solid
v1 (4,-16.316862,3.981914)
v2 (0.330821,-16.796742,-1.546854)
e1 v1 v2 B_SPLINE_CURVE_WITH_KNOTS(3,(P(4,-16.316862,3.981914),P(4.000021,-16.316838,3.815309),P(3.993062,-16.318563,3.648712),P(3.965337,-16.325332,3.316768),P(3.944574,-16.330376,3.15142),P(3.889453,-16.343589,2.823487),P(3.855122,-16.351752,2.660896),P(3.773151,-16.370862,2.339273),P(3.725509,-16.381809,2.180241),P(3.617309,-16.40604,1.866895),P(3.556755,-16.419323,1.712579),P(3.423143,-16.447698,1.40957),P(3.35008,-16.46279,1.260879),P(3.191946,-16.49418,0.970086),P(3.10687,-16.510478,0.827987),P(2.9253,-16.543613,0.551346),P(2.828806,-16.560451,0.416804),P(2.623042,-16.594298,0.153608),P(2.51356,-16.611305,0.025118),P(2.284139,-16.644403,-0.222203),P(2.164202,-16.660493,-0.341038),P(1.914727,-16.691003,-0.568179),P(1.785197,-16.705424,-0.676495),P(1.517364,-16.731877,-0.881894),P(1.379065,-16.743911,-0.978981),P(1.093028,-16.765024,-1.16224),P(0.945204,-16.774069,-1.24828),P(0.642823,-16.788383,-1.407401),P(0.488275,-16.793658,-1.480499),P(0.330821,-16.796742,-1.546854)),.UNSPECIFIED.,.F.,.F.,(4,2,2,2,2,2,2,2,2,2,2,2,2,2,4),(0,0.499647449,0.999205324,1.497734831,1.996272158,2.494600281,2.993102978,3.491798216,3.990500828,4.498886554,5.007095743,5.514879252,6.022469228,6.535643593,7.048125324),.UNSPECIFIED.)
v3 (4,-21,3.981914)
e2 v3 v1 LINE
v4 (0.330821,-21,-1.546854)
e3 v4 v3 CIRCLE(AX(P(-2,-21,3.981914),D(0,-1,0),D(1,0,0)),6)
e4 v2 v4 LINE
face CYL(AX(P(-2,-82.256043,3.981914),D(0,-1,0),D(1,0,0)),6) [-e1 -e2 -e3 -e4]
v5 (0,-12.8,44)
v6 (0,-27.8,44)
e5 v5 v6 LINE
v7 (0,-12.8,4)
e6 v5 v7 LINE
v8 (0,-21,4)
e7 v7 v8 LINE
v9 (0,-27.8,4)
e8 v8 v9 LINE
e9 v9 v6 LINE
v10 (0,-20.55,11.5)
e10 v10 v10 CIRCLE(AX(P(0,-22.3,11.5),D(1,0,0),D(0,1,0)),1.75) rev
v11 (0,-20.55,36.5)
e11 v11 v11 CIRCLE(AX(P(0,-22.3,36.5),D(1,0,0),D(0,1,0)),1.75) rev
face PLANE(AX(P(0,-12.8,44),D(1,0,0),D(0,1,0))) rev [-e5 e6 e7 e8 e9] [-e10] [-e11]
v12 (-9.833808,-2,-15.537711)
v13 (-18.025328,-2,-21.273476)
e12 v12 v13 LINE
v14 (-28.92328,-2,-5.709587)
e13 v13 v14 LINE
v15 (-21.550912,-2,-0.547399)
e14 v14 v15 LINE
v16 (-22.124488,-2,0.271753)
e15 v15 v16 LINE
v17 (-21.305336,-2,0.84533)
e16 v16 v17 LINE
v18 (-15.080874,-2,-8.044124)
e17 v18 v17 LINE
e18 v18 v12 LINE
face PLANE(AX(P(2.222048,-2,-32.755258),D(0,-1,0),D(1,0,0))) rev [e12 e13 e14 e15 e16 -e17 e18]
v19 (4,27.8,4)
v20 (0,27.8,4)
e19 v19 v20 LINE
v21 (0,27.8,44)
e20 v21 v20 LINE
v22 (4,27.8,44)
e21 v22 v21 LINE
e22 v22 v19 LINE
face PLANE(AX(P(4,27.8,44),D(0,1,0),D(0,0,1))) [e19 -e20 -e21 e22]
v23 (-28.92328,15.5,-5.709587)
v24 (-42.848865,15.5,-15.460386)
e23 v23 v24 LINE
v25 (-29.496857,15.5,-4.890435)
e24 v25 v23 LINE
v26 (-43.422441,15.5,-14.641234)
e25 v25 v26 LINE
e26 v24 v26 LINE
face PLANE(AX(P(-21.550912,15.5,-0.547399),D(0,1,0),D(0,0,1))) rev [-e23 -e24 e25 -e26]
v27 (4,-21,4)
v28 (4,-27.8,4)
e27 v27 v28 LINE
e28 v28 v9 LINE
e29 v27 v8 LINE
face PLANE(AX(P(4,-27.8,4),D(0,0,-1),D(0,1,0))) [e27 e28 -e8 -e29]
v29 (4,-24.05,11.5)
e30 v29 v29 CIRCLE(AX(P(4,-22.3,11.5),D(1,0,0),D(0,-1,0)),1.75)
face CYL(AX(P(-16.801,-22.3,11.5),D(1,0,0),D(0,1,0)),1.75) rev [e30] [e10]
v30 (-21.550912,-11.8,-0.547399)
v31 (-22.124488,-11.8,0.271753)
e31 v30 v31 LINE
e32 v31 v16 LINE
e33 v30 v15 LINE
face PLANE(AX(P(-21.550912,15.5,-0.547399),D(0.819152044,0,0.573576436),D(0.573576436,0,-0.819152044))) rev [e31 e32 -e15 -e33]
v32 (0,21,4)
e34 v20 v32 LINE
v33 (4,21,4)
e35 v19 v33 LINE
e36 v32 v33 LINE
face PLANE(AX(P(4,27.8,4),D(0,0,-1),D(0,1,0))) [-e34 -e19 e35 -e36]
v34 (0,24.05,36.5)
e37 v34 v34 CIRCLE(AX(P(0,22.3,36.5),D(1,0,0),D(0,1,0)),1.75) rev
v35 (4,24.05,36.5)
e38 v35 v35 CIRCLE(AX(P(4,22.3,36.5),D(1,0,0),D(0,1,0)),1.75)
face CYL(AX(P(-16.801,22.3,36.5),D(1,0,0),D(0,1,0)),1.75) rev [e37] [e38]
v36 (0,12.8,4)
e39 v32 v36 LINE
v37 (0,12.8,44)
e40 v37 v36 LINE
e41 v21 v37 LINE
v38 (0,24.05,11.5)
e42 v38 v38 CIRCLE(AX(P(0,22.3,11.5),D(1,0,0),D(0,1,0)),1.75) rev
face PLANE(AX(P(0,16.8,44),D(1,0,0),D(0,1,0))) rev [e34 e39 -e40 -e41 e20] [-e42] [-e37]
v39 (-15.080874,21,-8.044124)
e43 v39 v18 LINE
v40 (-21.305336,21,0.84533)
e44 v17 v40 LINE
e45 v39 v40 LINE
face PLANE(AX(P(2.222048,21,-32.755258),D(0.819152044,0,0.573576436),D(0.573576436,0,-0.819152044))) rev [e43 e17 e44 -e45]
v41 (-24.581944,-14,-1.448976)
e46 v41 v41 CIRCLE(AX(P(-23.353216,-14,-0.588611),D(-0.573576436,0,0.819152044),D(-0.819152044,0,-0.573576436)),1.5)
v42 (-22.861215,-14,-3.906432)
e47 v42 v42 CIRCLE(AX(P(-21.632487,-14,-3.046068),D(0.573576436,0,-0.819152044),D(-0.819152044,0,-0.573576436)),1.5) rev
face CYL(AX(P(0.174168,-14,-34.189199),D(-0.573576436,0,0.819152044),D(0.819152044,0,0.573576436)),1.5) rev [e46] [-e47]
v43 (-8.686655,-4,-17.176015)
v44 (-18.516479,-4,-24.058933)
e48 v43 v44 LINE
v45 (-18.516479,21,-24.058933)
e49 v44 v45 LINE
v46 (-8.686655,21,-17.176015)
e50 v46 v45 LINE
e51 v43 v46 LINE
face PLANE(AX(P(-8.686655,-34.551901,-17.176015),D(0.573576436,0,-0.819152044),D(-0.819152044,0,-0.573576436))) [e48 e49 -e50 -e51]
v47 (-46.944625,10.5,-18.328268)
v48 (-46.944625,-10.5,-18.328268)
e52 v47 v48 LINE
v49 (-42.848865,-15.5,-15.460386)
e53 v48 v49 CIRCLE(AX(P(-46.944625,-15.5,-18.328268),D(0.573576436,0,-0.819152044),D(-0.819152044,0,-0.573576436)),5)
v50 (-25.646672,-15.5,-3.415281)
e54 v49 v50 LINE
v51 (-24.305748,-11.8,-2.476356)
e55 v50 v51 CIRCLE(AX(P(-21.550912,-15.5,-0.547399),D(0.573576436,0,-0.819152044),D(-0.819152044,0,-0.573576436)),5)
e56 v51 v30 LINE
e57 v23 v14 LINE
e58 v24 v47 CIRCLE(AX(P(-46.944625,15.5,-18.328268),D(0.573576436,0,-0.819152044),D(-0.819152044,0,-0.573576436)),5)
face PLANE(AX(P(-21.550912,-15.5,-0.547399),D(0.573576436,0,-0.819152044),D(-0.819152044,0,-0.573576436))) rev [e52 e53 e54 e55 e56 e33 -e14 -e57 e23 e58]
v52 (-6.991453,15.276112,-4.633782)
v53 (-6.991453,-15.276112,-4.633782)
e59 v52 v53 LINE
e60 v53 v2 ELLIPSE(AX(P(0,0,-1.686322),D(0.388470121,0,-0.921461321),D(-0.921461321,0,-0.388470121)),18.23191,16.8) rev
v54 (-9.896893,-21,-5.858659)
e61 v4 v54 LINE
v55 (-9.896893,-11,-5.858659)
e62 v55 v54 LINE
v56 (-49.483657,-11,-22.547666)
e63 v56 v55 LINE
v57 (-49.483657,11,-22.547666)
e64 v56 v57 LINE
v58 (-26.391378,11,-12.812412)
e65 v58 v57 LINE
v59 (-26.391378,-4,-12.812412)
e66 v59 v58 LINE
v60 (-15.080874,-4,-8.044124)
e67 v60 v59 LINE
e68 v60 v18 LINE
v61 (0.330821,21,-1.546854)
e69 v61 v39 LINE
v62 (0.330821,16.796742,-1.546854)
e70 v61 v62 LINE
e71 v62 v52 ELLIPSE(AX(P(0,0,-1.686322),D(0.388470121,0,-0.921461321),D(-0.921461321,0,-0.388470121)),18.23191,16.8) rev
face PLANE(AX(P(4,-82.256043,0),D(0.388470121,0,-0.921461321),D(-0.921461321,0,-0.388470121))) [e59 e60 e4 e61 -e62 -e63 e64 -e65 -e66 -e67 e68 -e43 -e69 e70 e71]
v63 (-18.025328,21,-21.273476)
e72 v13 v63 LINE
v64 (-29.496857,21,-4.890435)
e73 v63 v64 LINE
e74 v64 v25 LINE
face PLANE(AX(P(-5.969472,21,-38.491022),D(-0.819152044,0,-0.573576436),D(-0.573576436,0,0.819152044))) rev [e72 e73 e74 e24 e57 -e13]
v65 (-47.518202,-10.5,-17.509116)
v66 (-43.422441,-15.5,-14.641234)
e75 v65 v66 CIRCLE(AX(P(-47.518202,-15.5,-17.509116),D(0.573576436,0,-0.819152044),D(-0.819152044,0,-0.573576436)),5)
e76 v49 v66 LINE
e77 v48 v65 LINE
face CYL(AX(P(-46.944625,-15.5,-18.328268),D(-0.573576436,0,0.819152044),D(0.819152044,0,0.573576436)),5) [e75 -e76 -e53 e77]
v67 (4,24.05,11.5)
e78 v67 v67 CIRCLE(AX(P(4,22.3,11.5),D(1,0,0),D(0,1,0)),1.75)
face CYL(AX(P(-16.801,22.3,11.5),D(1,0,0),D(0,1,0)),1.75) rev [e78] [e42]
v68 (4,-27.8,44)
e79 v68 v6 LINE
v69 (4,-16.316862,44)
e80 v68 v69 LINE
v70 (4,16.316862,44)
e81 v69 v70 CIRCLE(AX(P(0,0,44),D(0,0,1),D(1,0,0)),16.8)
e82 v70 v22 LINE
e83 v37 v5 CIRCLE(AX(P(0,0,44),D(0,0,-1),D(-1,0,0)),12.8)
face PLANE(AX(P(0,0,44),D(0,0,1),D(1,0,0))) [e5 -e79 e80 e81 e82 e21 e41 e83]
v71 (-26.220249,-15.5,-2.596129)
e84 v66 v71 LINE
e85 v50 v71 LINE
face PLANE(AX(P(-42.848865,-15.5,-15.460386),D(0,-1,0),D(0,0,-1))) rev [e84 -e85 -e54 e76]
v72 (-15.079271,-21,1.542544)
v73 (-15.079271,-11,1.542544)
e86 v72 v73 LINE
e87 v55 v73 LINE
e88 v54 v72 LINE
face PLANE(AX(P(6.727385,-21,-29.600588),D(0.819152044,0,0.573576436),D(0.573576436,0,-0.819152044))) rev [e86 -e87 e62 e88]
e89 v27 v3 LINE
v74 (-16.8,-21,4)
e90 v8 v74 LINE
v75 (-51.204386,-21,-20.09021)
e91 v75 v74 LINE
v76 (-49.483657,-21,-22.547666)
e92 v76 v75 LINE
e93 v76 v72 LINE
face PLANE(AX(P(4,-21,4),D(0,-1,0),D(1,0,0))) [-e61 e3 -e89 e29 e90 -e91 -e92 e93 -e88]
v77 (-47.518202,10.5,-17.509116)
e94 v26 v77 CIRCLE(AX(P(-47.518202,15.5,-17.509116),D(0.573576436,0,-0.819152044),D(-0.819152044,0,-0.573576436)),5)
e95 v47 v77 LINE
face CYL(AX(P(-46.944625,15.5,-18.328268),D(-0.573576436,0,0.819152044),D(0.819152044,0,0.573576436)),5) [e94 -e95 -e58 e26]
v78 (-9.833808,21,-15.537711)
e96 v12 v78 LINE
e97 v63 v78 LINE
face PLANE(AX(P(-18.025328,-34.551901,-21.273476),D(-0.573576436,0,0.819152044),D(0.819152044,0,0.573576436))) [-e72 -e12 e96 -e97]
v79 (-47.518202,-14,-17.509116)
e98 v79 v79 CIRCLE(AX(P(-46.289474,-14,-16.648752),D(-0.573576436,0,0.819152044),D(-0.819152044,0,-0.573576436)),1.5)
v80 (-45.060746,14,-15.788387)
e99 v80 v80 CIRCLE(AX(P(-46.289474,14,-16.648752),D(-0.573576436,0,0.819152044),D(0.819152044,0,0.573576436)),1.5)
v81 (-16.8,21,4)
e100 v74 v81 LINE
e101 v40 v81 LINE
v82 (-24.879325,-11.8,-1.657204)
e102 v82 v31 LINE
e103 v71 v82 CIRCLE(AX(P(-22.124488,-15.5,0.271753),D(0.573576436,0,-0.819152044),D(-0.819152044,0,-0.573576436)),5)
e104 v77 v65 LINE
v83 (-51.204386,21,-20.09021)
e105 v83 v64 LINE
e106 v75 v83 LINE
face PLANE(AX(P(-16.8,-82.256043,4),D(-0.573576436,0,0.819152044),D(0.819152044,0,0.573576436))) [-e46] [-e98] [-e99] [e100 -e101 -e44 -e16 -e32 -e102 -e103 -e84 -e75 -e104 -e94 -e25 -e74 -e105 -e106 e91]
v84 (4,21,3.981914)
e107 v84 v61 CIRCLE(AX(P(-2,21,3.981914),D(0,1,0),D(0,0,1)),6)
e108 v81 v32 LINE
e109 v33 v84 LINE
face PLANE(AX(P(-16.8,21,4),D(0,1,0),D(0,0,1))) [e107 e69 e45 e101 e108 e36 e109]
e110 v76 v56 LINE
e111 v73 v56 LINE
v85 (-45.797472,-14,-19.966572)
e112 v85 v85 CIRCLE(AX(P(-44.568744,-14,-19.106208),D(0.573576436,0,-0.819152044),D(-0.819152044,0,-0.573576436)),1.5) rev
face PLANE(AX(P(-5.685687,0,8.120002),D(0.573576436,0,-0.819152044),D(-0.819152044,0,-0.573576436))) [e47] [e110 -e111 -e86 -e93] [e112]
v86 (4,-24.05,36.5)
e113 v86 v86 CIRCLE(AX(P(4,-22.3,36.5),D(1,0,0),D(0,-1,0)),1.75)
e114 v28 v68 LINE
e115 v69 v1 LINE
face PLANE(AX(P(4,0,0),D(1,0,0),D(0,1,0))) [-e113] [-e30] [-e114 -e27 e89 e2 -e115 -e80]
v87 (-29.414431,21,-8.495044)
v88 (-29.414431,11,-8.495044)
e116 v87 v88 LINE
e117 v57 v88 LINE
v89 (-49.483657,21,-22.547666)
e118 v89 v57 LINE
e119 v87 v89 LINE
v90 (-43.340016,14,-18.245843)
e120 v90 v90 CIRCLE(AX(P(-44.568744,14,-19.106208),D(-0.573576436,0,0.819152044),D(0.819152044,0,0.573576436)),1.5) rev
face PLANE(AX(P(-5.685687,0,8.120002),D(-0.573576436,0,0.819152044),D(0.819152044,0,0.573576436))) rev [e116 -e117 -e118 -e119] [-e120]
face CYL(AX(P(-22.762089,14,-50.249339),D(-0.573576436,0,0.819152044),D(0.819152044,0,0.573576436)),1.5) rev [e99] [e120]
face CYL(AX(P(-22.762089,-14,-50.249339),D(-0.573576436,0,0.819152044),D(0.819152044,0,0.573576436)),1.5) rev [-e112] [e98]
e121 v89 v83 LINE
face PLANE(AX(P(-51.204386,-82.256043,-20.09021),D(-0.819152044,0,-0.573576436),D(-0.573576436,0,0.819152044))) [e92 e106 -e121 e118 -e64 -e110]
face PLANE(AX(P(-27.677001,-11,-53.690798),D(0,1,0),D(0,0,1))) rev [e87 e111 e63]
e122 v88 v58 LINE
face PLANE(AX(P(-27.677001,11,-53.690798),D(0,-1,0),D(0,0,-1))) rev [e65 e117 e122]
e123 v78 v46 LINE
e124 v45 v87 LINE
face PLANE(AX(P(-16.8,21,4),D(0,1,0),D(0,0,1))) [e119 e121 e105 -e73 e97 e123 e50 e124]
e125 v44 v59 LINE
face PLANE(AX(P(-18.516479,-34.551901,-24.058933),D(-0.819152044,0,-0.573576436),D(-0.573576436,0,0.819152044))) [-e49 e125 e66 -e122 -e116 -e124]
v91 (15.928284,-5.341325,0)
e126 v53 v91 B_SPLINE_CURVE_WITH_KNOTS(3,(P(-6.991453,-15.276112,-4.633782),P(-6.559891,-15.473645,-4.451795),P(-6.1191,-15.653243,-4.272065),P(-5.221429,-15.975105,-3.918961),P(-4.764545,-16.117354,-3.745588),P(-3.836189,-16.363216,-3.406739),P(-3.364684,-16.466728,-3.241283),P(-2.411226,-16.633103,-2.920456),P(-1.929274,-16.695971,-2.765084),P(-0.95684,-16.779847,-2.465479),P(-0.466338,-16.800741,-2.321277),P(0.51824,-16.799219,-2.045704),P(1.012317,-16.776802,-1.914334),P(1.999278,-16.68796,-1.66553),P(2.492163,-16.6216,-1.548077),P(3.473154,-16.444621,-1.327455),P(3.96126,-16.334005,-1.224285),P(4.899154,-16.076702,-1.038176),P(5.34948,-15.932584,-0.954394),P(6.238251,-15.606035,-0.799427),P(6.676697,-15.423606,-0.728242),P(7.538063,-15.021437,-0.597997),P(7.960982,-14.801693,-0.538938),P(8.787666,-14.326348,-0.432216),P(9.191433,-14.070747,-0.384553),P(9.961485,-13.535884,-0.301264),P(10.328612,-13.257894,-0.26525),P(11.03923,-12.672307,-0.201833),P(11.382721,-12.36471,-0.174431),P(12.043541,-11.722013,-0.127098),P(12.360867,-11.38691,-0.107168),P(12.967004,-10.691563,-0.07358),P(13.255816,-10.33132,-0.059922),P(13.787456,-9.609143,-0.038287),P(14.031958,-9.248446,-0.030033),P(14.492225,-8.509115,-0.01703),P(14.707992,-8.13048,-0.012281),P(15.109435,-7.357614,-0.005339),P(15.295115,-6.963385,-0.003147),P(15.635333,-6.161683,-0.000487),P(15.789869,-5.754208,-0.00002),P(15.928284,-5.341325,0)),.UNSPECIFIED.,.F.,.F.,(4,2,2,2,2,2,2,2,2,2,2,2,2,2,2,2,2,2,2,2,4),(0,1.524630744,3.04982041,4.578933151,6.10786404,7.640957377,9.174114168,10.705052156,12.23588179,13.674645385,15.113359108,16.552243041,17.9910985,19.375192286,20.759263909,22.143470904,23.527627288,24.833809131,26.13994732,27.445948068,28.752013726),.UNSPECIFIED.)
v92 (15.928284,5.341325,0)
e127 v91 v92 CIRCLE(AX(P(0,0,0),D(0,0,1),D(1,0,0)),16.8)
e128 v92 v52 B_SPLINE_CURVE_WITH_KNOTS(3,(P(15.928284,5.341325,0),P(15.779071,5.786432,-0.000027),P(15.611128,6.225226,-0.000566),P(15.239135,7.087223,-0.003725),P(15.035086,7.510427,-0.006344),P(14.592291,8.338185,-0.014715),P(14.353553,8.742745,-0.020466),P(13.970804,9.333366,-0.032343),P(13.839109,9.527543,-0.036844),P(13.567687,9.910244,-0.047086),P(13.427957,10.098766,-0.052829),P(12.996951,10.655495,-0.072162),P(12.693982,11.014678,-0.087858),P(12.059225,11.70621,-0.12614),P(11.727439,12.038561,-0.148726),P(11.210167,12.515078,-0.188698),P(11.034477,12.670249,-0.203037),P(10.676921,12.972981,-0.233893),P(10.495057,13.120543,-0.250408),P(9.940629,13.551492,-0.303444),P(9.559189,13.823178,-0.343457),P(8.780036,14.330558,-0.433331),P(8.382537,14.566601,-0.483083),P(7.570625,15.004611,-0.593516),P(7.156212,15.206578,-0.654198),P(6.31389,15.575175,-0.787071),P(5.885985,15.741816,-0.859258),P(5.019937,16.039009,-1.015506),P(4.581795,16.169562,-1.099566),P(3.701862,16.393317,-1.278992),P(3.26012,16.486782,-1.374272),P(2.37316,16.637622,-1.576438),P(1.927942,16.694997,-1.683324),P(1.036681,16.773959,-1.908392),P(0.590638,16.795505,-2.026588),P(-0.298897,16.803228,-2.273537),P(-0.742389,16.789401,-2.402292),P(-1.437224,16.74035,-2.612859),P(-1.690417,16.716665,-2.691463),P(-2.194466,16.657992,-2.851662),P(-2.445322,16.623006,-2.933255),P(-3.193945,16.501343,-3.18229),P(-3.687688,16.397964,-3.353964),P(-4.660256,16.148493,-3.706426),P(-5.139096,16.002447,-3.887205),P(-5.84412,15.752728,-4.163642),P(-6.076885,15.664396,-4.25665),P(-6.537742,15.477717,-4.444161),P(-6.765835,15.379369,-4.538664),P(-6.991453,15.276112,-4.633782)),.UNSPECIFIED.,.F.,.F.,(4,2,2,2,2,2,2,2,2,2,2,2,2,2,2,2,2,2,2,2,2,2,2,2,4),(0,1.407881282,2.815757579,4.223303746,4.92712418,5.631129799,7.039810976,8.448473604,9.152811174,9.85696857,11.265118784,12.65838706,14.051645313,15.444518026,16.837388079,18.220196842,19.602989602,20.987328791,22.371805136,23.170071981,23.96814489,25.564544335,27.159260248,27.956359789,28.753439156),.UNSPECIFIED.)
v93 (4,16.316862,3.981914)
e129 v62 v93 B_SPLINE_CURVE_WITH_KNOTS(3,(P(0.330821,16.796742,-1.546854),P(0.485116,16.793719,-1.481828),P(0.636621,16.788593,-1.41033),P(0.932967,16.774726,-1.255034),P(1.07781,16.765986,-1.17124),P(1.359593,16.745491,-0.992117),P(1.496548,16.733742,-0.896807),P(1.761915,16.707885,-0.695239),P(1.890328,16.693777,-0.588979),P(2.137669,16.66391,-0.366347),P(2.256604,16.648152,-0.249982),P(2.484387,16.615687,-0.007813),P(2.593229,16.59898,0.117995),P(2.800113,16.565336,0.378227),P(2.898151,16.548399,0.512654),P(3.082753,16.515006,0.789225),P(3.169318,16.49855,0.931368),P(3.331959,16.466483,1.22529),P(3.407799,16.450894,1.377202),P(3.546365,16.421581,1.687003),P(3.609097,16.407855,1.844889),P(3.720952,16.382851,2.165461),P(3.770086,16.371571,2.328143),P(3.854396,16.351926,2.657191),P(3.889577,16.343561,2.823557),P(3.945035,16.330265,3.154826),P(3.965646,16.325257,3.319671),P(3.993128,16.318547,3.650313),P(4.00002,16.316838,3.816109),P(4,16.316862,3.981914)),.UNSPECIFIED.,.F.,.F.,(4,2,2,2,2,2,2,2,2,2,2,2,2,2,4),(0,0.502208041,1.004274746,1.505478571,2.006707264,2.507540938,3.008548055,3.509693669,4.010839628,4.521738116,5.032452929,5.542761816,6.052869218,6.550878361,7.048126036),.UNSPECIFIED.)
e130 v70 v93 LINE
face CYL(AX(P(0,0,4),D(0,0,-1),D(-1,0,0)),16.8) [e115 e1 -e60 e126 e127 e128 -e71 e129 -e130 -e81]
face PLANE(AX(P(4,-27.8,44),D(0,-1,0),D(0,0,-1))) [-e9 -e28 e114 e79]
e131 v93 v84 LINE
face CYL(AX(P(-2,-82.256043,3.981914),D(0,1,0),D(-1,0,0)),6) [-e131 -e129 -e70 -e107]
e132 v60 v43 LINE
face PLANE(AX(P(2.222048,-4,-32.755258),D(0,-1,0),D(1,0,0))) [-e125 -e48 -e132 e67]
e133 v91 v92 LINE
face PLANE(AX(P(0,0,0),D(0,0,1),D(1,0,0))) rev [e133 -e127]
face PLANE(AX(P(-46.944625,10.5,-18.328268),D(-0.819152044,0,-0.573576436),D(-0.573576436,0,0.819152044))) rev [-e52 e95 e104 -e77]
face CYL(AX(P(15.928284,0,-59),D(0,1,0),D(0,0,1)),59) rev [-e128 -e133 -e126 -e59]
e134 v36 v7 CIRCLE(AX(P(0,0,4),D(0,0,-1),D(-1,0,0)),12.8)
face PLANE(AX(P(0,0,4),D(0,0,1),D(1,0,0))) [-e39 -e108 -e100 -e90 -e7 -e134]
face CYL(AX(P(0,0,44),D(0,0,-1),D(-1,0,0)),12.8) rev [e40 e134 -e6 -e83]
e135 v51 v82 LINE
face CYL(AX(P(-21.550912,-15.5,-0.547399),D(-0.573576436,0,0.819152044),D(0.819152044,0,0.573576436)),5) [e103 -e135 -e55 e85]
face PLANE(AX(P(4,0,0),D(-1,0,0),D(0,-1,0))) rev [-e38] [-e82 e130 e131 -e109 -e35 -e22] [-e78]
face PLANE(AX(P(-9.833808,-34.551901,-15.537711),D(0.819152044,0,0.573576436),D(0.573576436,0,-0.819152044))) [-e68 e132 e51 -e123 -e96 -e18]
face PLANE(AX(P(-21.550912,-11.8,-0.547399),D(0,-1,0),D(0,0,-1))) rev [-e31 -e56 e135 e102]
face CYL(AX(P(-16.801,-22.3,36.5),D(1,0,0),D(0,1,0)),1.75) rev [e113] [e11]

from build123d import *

# Parameters (mm, degrees)
SKETCH1_R           = 16.8
BOSS_EXTRUDE1_DEPTH = 4
BOSS_EXTRUDE2_DEPTH = 40
BOSS_EXTRUDE3_START = 4
BOSS_EXTRUDE3_DEPTH = 40
CUT_EXTRUDE1_REACH  = 58.049
SKETCH4_R           = 1.75
SKETCH6_W           = 20.8
SKETCH6_H           = 42
BOSS_EXTRUDE5_DEPTH = 4
BOSS_EXTRUDE7_REACH = 69.821
SKETCH14_R          = 1.5
CUT_EXTRUDE7_DEPTH  = 62.710359375
CUT_EXTRUDE8_START  = -3
SKETCH15_W          = 27
SKETCH15_H          = 10
SKETCH15_W_2        = 42
CUT_EXTRUDE8_DEPTH  = 59.710359375
SKETCH16_W          = 10
SKETCH16_H          = 23
CUT_EXTRUDE9_DEPTH  = 62.710359375
CUT_EXTRUDE10_DEPTH = 1
FILLET2_R           = 59
FILLET4_R           = 6
BOSS_EXTRUDE8_DEPTH = 25
BOSS_EXTRUDE9_START = -13.299219
SKETCH19_W          = 12
SKETCH19_H          = 2
BOSS_EXTRUDE9_DEPTH = 11.299219


# Read off the part's stored shape, not the designer's step: Boss-Extrude3
with BuildPart() as part:
    # Sketch1 → Boss-Extrude1 (new body)
    with BuildSketch(Plane(origin=(0, 0, 0), x_dir=(0, 1, 0), z_dir=(0, 0, 1))):
        with Locations(Location((0, 0, 0), (0, 0, 270))):
            Circle(SKETCH1_R)
    extrude(amount=BOSS_EXTRUDE1_DEPTH)

    # Sketch2 → Boss-Extrude2 (add)
    with BuildSketch(Plane.XY.offset(4)):
        with BuildLine():
            Line((0, 16.8), (0, 12.8))
            ThreePointArc((0, 12.8), (12.8, 0), (0, -12.8))
            Line((0, -12.8), (0, -16.8))
            ThreePointArc((0, -16.8), (16.8, 0), (0, 16.8))
        make_face()
    extrude(amount=BOSS_EXTRUDE2_DEPTH)

    # Boss-Extrude3 outline → Boss-Extrude3 (add)
    with BuildSketch(Plane.XY.offset(BOSS_EXTRUDE3_START)):
        with BuildLine():
            Line((0, 27.8), (0, 16.8))
            ThreePointArc((0, 16.8), (2.014536045, 16.678778268), (4, 16.316862443))
            Line((4, 16.316862443), (4, 27.8))
            Line((4, 27.8), (0, 27.8))
        make_face()
        with BuildLine():
            ThreePointArc((4, -16.316862443), (2.014536045, -16.678778268), (0, -16.8))
            Line((0, -16.8), (0, -27.8))
            Line((0, -27.8), (4, -27.8))
            Line((4, -27.8), (4, -16.316862443))
        make_face()
    extrude(amount=BOSS_EXTRUDE3_DEPTH)

    # Sketch4 → Cut-Extrude1 (cut, up to next)
    with BuildSketch(Plane.YZ.offset(4), mode=Mode.PRIVATE) as cut_extrude1_sk1:
        with Locations((22.3, 36.5)):
            Circle(SKETCH4_R)
    cut_extrude1_tool1 = extrude(cut_extrude1_sk1.sketch, amount=-CUT_EXTRUDE1_REACH, mode=Mode.PRIVATE) & part.part
    # Sketch4 → Cut-Extrude1 (cut, up to next)
    with BuildSketch(Plane.YZ.offset(4), mode=Mode.PRIVATE) as cut_extrude1_sk2:
        with Locations((22.3, 11.5)):
            Circle(SKETCH4_R)
    cut_extrude1_tool2 = extrude(cut_extrude1_sk2.sketch, amount=-CUT_EXTRUDE1_REACH, mode=Mode.PRIVATE) & part.part
    # Sketch4 → Cut-Extrude1 (cut, up to next)
    with BuildSketch(Plane.YZ.offset(4), mode=Mode.PRIVATE) as cut_extrude1_sk3:
        with Locations((-22.3, 11.5)):
            Circle(SKETCH4_R)
    cut_extrude1_tool3 = extrude(cut_extrude1_sk3.sketch, amount=-CUT_EXTRUDE1_REACH, mode=Mode.PRIVATE) & part.part
    # Sketch4 → Cut-Extrude1 (cut, up to next)
    with BuildSketch(Plane.YZ.offset(4), mode=Mode.PRIVATE) as cut_extrude1_sk4:
        with Locations((-22.3, 36.5)):
            Circle(SKETCH4_R)
    cut_extrude1_tool4 = extrude(cut_extrude1_sk4.sketch, amount=-CUT_EXTRUDE1_REACH, mode=Mode.PRIVATE) & part.part
    add(cut_extrude1_tool1.solids().sort_by_distance((4, 22.3, 36.5))[0], mode=Mode.SUBTRACT)
    add(cut_extrude1_tool2.solids().sort_by_distance((4, 22.3, 11.5))[0], mode=Mode.SUBTRACT)
    add(cut_extrude1_tool3.solids().sort_by_distance((4, -22.3, 11.5))[0], mode=Mode.SUBTRACT)
    add(cut_extrude1_tool4.solids().sort_by_distance((4, -22.3, 36.5))[0], mode=Mode.SUBTRACT)

    # Sketch6 → Boss-Extrude5 (add)
    with BuildSketch(Plane(origin=(0, 0, 0), x_dir=(1, 0, 0), z_dir=(0, 0, -1))):
        with Locations((-6.4, 0)):
            Rectangle(SKETCH6_W, SKETCH6_H)
    extrude(amount=-BOSS_EXTRUDE5_DEPTH)

    # Boss-Extrude7: up to this face of the body (flat: up to its plane)
    boss_extrude7_end = Plane(part.part.faces().sort_by_distance((-6.4, -21, 2))[0])
    # Sketch10 → Boss-Extrude7 (add, up to the picked face)
    with BuildSketch(Plane(origin=(0, 21, 0), x_dir=(-1, 0, 0), z_dir=(0, 1, 0)), mode=Mode.PRIVATE) as boss_extrude7_sk1:
        Polygon((-4, 0), (49.483656551, -22.54766646), (51.20438586, -20.090210327), (16.8, 4), (-4, 4), align=None)
    boss_extrude7_tool1 = split(extrude(boss_extrude7_sk1.sketch, amount=-BOSS_EXTRUDE7_REACH, mode=Mode.PRIVATE), bisect_by=boss_extrude7_end, keep=Keep.BOTH, mode=Mode.PRIVATE)
    add(boss_extrude7_tool1.solids().sort_by(Axis((-21.697526, 21, -6.303092), (0, -1, 0)))[0])

    # Sketch14 → Cut-Extrude7 (cut, through all)
    with BuildSketch(Plane(origin=(-7.406416038, 0, 10.577458301), x_dir=(0.8191520442889908, 0, 0.5735764363510476), z_dir=(-0.5735764363510476, 0, 0.8191520442889909))):
        with Locations((-47.467448599, 14)):
            Circle(SKETCH14_R)
        with Locations((-19.467448599, 14)):
            Circle(SKETCH14_R)
        with Locations(Location((-19.467448599, -14, 0), (0, 0, 180))):
            Circle(SKETCH14_R)
        with Locations(Location((-47.467448599, -14, 0), (0, 0, 180))):
            Circle(SKETCH14_R)
    extrude(amount=-CUT_EXTRUDE7_DEPTH, mode=Mode.SUBTRACT)

    # Sketch15 → Cut-Extrude8 (cut, through all)
    with BuildSketch(Plane(origin=(-7.406416038, 0, 10.577458301), x_dir=(0.8191520442889908, 0, 0.5735764363510476), z_dir=(-0.5735764363510476, 0, 0.8191520442889909)).offset(CUT_EXTRUDE8_START)):
        with Locations((-39.967448599, 16)):
            Rectangle(SKETCH15_W, SKETCH15_H)
        with Locations((-32.467448599, -16)):
            Rectangle(SKETCH15_W_2, SKETCH15_H)
    extrude(amount=-CUT_EXTRUDE8_DEPTH, mode=Mode.SUBTRACT)

    # Sketch16 → Cut-Extrude9 (cut, through all)
    with BuildSketch(Plane(origin=(-7.406416038, 0, 10.577458301), x_dir=(0.8191520442889908, 0, 0.5735764363510476), z_dir=(-0.5735764363510476, 0, 0.8191520442889909))):
        with Locations((-21.967448599, 9.5)):
            Rectangle(SKETCH16_W, SKETCH16_H)
    extrude(amount=-CUT_EXTRUDE9_DEPTH, mode=Mode.SUBTRACT)

    # Sketch17 → Cut-Extrude10 (cut)
    with BuildSketch(Plane(origin=(-7.406416038, 0, 10.577458301), x_dir=(0.8191520442889908, 0, 0.5735764363510476), z_dir=(-0.5735764363510476, 0, 0.8191520442889909))):
        with BuildLine():
            Line((-48.967448599, 10.5), (-48.967448599, -10.5))
            ThreePointArc((-48.967448599, -10.5), (-45.431914693, -11.964466094), (-43.967448599, -15.5))
            Line((-43.967448599, -15.5), (-22.967448599, -15.5))
            ThreePointArc((-22.967448599, -15.5), (-22.539929967, -13.477028389), (-21.330482943, -11.8))
            Line((-21.330482943, -11.8), (-17.967448599, -11.8))
            Line((-17.967448599, -11.8), (-17.967448599, 15.5))
            Line((-17.967448599, 15.5), (-43.967448599, 15.5))
            ThreePointArc((-43.967448599, 15.5), (-45.431914693, 11.964466094), (-48.967448599, 10.5))
        make_face()
    extrude(amount=-CUT_EXTRUDE10_DEPTH, mode=Mode.SUBTRACT)

    # Fillet2
    fillet2_edges = [part.edges().sort_by_distance(p)[0] for p in [
        (4, 0, 0),
    ]]
    fillet(fillet2_edges, radius=FILLET2_R)

    # Fillet4
    fillet4_edges = [part.edges().sort_by_distance(p)[0] for p in [
        (4, 18.658431222, 0),
        (4, -18.658431222, 0),
    ]]
    fillet(fillet4_edges, radius=FILLET4_R)

    # Sketch18 → Boss-Extrude8 (add)
    with BuildSketch(Plane(origin=(0, 21, 0), x_dir=(-1, 0, 0), z_dir=(0, 1, 0))):
        Polygon((28.92328025, -5.709586808), (18.025327959, -21.273475649), (9.833807517, -15.537711286), (8.686654644, -17.176015374), (18.516479175, -24.058932611), (30.561584339, -6.85673968), align=None)
    extrude(amount=-BOSS_EXTRUDE8_DEPTH)

    # Sketch19 → Boss-Extrude9 (add)
    with BuildSketch(Plane(origin=(5.212265562, 0, -7.443886673), x_dir=(0.819152044288991, 0, 0.5735764363510472), z_dir=(0.5735764363510472, 0, -0.819152044288991)).offset(BOSS_EXTRUDE9_START)):
        with Locations((-22.967448599, 3)):
            Rectangle(SKETCH19_W, SKETCH19_H)
    extrude(amount=BOSS_EXTRUDE9_DEPTH)


solid = part.part
